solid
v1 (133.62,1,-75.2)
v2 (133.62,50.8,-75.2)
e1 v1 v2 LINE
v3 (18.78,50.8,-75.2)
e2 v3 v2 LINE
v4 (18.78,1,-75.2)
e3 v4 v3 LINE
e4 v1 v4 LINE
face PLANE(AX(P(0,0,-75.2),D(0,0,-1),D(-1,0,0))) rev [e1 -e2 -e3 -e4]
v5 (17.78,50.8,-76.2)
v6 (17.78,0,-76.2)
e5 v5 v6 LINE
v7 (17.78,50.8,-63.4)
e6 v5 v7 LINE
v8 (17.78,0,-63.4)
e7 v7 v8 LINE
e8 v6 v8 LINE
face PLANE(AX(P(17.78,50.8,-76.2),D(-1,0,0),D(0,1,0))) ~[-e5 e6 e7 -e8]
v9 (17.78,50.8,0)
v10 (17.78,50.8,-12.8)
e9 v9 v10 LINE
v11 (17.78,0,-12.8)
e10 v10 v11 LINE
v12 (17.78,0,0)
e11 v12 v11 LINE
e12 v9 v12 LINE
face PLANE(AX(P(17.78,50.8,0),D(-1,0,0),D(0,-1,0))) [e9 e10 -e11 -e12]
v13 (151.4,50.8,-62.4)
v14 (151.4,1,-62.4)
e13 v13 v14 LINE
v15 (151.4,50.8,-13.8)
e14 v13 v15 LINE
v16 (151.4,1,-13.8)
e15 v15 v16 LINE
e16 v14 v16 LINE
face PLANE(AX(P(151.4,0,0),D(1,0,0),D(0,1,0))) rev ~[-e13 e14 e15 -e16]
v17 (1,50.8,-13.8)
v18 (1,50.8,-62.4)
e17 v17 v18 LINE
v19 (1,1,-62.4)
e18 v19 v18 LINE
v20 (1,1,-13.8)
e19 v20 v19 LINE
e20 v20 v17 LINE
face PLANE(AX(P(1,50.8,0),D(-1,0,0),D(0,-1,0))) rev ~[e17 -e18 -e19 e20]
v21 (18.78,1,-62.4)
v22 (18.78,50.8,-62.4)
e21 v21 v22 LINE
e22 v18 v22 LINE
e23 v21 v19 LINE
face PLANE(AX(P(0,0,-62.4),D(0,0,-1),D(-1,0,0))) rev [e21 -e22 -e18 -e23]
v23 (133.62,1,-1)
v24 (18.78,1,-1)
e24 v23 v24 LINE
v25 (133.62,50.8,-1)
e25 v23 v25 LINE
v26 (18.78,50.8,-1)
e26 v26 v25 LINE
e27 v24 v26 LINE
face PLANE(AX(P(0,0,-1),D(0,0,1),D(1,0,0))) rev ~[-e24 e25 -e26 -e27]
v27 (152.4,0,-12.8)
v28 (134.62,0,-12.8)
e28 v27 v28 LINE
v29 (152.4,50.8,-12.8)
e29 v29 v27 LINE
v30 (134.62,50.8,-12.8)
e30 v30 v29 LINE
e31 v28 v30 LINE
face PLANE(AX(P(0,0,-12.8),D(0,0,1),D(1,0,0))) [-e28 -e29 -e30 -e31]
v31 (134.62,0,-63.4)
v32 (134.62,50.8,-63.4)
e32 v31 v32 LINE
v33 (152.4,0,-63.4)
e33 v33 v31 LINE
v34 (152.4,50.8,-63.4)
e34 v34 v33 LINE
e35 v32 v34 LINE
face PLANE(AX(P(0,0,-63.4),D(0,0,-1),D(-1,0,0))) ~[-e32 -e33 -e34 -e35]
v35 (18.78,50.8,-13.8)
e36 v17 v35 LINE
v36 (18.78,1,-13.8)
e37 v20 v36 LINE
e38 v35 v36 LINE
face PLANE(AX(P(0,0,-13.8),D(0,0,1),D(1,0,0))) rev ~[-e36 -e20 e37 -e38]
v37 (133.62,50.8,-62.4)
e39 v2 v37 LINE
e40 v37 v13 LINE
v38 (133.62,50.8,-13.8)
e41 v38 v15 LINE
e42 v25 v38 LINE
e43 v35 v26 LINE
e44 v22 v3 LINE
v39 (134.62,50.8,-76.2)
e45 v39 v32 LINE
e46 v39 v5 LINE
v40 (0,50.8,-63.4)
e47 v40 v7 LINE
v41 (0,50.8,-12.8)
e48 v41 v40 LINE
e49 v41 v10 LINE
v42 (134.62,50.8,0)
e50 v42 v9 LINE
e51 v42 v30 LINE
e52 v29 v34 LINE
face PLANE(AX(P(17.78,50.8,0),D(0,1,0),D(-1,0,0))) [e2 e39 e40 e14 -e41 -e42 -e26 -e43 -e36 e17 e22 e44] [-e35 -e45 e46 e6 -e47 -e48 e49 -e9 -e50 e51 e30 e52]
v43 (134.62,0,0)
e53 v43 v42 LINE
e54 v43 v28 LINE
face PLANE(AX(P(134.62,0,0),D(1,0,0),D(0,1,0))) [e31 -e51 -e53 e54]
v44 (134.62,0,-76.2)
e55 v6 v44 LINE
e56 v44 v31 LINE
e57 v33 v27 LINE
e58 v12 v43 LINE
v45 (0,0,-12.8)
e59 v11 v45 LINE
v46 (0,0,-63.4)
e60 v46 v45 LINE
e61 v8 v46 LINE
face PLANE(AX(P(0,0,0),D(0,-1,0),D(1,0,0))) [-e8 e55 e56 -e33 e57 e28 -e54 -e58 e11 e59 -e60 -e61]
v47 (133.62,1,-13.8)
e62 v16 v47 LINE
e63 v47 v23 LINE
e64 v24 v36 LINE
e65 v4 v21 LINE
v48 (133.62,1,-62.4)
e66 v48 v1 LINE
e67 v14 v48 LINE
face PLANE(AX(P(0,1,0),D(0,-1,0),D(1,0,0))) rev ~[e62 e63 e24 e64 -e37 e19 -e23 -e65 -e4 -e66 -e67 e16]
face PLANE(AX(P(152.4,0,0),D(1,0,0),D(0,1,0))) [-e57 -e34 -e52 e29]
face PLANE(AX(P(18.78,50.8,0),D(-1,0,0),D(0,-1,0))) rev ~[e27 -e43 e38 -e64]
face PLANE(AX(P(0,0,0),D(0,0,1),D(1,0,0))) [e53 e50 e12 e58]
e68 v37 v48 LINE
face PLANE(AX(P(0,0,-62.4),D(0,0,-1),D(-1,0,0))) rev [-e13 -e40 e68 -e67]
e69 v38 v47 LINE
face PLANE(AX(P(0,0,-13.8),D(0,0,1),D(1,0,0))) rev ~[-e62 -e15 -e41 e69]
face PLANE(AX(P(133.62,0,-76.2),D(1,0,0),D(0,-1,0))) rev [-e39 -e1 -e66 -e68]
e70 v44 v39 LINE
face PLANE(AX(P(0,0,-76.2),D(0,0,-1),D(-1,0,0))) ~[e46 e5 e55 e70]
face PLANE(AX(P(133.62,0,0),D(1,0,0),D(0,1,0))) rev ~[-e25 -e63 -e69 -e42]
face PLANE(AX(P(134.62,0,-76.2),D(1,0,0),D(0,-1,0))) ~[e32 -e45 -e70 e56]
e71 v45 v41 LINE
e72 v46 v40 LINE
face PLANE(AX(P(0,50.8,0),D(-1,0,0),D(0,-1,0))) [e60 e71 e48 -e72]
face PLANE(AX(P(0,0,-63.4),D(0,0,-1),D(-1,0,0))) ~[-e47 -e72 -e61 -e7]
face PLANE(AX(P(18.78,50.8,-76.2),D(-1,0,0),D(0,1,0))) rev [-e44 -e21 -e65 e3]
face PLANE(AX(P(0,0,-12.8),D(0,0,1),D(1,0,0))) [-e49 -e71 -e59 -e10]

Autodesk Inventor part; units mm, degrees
ref_plane "YZ Plane" through (0, 0, 0) normal (1, 0, 0) x (0, 1, 0)
ref_plane "XZ Plane" through (0, 0, 0) normal (0, 1, 0) x (-1, 0, 0)
sketch "Sketch1" plane through (0, 0, 0) normal (0, 0, 1) x (1, 0, 0)
  line L0 (0, 0) -> (152.4, 0)
  line L1 (152.4, 0) -> (152.4, 50.8)
  line L2 (152.4, 50.8) -> (0, 50.8)
  line L3 (0, 50.8) -> (0, 0)
  line L4 (0, 50.8) -> (17.78, 50.8)
  line L5 (17.78, 0) -> (0, 0)
  line L6 (0, 0) -> (0, 50.8)
  line L7 (152.4, 0) -> (134.62, 0)
  line L8 (134.62, 50.8) -> (152.4, 50.8)
  line L9 (152.4, 50.8) -> (152.4, 0)
  dimension "d0" = 152.4
  dimension "d1" = 50.8
extrude "Extrusion1" add sketch "Sketch1" against normal blind 38.1
sketch "Sketch2" plane through (0, 0, 0) normal (0, 0, 1) x (1, 0, 0)
  line L0 (0, 50.8) -> (152.4, 50.8) projected
  line L1 (152.4, 0) -> (0, 0) projected
  line L2 (0, 50.8) -> (17.78, 50.8)
  line L3 (17.78, 50.8) -> (17.78, 0)
  line L4 (17.78, 0) -> (0, 0)
  line L5 (0, 0) -> (0, 50.8)
  line L6 (152.4, 0) -> (134.62, 0)
  line L7 (134.62, 0) -> (134.62, 50.8)
  line L8 (134.62, 50.8) -> (152.4, 50.8)
  line L9 (152.4, 50.8) -> (152.4, 0)
  point P0 (134.62, 0)
  dimension "d6" = 17.78
  dimension "d7" = 17.78
extrude "Extrusion2" cut sketch "Sketch2" against normal blind 12.8 contours L0 L3 L1 L5 | L0 L9 L1 L7
shell "Shell1" thickness 1 removed faces 2 at (56.7267, 50.8, -29.6667) at (101.6, 16.9333, -38.1)
ref_plane "Work Plane3" through (133.62, 1, -38.1) normal (0, 0, -1) x (-1, 0, 0)
mirror "Mirror2" about plane through (133.62, 1, -38.1) normal (0, 0, -1) of "Extrusion1", "Extrusion2"
shell "Shell6" thickness 1 removed faces 2 at (95.6733, 50.8, -46.5333) at (101.2667, 17.6, -38.1)
properties part number "Footprint"
